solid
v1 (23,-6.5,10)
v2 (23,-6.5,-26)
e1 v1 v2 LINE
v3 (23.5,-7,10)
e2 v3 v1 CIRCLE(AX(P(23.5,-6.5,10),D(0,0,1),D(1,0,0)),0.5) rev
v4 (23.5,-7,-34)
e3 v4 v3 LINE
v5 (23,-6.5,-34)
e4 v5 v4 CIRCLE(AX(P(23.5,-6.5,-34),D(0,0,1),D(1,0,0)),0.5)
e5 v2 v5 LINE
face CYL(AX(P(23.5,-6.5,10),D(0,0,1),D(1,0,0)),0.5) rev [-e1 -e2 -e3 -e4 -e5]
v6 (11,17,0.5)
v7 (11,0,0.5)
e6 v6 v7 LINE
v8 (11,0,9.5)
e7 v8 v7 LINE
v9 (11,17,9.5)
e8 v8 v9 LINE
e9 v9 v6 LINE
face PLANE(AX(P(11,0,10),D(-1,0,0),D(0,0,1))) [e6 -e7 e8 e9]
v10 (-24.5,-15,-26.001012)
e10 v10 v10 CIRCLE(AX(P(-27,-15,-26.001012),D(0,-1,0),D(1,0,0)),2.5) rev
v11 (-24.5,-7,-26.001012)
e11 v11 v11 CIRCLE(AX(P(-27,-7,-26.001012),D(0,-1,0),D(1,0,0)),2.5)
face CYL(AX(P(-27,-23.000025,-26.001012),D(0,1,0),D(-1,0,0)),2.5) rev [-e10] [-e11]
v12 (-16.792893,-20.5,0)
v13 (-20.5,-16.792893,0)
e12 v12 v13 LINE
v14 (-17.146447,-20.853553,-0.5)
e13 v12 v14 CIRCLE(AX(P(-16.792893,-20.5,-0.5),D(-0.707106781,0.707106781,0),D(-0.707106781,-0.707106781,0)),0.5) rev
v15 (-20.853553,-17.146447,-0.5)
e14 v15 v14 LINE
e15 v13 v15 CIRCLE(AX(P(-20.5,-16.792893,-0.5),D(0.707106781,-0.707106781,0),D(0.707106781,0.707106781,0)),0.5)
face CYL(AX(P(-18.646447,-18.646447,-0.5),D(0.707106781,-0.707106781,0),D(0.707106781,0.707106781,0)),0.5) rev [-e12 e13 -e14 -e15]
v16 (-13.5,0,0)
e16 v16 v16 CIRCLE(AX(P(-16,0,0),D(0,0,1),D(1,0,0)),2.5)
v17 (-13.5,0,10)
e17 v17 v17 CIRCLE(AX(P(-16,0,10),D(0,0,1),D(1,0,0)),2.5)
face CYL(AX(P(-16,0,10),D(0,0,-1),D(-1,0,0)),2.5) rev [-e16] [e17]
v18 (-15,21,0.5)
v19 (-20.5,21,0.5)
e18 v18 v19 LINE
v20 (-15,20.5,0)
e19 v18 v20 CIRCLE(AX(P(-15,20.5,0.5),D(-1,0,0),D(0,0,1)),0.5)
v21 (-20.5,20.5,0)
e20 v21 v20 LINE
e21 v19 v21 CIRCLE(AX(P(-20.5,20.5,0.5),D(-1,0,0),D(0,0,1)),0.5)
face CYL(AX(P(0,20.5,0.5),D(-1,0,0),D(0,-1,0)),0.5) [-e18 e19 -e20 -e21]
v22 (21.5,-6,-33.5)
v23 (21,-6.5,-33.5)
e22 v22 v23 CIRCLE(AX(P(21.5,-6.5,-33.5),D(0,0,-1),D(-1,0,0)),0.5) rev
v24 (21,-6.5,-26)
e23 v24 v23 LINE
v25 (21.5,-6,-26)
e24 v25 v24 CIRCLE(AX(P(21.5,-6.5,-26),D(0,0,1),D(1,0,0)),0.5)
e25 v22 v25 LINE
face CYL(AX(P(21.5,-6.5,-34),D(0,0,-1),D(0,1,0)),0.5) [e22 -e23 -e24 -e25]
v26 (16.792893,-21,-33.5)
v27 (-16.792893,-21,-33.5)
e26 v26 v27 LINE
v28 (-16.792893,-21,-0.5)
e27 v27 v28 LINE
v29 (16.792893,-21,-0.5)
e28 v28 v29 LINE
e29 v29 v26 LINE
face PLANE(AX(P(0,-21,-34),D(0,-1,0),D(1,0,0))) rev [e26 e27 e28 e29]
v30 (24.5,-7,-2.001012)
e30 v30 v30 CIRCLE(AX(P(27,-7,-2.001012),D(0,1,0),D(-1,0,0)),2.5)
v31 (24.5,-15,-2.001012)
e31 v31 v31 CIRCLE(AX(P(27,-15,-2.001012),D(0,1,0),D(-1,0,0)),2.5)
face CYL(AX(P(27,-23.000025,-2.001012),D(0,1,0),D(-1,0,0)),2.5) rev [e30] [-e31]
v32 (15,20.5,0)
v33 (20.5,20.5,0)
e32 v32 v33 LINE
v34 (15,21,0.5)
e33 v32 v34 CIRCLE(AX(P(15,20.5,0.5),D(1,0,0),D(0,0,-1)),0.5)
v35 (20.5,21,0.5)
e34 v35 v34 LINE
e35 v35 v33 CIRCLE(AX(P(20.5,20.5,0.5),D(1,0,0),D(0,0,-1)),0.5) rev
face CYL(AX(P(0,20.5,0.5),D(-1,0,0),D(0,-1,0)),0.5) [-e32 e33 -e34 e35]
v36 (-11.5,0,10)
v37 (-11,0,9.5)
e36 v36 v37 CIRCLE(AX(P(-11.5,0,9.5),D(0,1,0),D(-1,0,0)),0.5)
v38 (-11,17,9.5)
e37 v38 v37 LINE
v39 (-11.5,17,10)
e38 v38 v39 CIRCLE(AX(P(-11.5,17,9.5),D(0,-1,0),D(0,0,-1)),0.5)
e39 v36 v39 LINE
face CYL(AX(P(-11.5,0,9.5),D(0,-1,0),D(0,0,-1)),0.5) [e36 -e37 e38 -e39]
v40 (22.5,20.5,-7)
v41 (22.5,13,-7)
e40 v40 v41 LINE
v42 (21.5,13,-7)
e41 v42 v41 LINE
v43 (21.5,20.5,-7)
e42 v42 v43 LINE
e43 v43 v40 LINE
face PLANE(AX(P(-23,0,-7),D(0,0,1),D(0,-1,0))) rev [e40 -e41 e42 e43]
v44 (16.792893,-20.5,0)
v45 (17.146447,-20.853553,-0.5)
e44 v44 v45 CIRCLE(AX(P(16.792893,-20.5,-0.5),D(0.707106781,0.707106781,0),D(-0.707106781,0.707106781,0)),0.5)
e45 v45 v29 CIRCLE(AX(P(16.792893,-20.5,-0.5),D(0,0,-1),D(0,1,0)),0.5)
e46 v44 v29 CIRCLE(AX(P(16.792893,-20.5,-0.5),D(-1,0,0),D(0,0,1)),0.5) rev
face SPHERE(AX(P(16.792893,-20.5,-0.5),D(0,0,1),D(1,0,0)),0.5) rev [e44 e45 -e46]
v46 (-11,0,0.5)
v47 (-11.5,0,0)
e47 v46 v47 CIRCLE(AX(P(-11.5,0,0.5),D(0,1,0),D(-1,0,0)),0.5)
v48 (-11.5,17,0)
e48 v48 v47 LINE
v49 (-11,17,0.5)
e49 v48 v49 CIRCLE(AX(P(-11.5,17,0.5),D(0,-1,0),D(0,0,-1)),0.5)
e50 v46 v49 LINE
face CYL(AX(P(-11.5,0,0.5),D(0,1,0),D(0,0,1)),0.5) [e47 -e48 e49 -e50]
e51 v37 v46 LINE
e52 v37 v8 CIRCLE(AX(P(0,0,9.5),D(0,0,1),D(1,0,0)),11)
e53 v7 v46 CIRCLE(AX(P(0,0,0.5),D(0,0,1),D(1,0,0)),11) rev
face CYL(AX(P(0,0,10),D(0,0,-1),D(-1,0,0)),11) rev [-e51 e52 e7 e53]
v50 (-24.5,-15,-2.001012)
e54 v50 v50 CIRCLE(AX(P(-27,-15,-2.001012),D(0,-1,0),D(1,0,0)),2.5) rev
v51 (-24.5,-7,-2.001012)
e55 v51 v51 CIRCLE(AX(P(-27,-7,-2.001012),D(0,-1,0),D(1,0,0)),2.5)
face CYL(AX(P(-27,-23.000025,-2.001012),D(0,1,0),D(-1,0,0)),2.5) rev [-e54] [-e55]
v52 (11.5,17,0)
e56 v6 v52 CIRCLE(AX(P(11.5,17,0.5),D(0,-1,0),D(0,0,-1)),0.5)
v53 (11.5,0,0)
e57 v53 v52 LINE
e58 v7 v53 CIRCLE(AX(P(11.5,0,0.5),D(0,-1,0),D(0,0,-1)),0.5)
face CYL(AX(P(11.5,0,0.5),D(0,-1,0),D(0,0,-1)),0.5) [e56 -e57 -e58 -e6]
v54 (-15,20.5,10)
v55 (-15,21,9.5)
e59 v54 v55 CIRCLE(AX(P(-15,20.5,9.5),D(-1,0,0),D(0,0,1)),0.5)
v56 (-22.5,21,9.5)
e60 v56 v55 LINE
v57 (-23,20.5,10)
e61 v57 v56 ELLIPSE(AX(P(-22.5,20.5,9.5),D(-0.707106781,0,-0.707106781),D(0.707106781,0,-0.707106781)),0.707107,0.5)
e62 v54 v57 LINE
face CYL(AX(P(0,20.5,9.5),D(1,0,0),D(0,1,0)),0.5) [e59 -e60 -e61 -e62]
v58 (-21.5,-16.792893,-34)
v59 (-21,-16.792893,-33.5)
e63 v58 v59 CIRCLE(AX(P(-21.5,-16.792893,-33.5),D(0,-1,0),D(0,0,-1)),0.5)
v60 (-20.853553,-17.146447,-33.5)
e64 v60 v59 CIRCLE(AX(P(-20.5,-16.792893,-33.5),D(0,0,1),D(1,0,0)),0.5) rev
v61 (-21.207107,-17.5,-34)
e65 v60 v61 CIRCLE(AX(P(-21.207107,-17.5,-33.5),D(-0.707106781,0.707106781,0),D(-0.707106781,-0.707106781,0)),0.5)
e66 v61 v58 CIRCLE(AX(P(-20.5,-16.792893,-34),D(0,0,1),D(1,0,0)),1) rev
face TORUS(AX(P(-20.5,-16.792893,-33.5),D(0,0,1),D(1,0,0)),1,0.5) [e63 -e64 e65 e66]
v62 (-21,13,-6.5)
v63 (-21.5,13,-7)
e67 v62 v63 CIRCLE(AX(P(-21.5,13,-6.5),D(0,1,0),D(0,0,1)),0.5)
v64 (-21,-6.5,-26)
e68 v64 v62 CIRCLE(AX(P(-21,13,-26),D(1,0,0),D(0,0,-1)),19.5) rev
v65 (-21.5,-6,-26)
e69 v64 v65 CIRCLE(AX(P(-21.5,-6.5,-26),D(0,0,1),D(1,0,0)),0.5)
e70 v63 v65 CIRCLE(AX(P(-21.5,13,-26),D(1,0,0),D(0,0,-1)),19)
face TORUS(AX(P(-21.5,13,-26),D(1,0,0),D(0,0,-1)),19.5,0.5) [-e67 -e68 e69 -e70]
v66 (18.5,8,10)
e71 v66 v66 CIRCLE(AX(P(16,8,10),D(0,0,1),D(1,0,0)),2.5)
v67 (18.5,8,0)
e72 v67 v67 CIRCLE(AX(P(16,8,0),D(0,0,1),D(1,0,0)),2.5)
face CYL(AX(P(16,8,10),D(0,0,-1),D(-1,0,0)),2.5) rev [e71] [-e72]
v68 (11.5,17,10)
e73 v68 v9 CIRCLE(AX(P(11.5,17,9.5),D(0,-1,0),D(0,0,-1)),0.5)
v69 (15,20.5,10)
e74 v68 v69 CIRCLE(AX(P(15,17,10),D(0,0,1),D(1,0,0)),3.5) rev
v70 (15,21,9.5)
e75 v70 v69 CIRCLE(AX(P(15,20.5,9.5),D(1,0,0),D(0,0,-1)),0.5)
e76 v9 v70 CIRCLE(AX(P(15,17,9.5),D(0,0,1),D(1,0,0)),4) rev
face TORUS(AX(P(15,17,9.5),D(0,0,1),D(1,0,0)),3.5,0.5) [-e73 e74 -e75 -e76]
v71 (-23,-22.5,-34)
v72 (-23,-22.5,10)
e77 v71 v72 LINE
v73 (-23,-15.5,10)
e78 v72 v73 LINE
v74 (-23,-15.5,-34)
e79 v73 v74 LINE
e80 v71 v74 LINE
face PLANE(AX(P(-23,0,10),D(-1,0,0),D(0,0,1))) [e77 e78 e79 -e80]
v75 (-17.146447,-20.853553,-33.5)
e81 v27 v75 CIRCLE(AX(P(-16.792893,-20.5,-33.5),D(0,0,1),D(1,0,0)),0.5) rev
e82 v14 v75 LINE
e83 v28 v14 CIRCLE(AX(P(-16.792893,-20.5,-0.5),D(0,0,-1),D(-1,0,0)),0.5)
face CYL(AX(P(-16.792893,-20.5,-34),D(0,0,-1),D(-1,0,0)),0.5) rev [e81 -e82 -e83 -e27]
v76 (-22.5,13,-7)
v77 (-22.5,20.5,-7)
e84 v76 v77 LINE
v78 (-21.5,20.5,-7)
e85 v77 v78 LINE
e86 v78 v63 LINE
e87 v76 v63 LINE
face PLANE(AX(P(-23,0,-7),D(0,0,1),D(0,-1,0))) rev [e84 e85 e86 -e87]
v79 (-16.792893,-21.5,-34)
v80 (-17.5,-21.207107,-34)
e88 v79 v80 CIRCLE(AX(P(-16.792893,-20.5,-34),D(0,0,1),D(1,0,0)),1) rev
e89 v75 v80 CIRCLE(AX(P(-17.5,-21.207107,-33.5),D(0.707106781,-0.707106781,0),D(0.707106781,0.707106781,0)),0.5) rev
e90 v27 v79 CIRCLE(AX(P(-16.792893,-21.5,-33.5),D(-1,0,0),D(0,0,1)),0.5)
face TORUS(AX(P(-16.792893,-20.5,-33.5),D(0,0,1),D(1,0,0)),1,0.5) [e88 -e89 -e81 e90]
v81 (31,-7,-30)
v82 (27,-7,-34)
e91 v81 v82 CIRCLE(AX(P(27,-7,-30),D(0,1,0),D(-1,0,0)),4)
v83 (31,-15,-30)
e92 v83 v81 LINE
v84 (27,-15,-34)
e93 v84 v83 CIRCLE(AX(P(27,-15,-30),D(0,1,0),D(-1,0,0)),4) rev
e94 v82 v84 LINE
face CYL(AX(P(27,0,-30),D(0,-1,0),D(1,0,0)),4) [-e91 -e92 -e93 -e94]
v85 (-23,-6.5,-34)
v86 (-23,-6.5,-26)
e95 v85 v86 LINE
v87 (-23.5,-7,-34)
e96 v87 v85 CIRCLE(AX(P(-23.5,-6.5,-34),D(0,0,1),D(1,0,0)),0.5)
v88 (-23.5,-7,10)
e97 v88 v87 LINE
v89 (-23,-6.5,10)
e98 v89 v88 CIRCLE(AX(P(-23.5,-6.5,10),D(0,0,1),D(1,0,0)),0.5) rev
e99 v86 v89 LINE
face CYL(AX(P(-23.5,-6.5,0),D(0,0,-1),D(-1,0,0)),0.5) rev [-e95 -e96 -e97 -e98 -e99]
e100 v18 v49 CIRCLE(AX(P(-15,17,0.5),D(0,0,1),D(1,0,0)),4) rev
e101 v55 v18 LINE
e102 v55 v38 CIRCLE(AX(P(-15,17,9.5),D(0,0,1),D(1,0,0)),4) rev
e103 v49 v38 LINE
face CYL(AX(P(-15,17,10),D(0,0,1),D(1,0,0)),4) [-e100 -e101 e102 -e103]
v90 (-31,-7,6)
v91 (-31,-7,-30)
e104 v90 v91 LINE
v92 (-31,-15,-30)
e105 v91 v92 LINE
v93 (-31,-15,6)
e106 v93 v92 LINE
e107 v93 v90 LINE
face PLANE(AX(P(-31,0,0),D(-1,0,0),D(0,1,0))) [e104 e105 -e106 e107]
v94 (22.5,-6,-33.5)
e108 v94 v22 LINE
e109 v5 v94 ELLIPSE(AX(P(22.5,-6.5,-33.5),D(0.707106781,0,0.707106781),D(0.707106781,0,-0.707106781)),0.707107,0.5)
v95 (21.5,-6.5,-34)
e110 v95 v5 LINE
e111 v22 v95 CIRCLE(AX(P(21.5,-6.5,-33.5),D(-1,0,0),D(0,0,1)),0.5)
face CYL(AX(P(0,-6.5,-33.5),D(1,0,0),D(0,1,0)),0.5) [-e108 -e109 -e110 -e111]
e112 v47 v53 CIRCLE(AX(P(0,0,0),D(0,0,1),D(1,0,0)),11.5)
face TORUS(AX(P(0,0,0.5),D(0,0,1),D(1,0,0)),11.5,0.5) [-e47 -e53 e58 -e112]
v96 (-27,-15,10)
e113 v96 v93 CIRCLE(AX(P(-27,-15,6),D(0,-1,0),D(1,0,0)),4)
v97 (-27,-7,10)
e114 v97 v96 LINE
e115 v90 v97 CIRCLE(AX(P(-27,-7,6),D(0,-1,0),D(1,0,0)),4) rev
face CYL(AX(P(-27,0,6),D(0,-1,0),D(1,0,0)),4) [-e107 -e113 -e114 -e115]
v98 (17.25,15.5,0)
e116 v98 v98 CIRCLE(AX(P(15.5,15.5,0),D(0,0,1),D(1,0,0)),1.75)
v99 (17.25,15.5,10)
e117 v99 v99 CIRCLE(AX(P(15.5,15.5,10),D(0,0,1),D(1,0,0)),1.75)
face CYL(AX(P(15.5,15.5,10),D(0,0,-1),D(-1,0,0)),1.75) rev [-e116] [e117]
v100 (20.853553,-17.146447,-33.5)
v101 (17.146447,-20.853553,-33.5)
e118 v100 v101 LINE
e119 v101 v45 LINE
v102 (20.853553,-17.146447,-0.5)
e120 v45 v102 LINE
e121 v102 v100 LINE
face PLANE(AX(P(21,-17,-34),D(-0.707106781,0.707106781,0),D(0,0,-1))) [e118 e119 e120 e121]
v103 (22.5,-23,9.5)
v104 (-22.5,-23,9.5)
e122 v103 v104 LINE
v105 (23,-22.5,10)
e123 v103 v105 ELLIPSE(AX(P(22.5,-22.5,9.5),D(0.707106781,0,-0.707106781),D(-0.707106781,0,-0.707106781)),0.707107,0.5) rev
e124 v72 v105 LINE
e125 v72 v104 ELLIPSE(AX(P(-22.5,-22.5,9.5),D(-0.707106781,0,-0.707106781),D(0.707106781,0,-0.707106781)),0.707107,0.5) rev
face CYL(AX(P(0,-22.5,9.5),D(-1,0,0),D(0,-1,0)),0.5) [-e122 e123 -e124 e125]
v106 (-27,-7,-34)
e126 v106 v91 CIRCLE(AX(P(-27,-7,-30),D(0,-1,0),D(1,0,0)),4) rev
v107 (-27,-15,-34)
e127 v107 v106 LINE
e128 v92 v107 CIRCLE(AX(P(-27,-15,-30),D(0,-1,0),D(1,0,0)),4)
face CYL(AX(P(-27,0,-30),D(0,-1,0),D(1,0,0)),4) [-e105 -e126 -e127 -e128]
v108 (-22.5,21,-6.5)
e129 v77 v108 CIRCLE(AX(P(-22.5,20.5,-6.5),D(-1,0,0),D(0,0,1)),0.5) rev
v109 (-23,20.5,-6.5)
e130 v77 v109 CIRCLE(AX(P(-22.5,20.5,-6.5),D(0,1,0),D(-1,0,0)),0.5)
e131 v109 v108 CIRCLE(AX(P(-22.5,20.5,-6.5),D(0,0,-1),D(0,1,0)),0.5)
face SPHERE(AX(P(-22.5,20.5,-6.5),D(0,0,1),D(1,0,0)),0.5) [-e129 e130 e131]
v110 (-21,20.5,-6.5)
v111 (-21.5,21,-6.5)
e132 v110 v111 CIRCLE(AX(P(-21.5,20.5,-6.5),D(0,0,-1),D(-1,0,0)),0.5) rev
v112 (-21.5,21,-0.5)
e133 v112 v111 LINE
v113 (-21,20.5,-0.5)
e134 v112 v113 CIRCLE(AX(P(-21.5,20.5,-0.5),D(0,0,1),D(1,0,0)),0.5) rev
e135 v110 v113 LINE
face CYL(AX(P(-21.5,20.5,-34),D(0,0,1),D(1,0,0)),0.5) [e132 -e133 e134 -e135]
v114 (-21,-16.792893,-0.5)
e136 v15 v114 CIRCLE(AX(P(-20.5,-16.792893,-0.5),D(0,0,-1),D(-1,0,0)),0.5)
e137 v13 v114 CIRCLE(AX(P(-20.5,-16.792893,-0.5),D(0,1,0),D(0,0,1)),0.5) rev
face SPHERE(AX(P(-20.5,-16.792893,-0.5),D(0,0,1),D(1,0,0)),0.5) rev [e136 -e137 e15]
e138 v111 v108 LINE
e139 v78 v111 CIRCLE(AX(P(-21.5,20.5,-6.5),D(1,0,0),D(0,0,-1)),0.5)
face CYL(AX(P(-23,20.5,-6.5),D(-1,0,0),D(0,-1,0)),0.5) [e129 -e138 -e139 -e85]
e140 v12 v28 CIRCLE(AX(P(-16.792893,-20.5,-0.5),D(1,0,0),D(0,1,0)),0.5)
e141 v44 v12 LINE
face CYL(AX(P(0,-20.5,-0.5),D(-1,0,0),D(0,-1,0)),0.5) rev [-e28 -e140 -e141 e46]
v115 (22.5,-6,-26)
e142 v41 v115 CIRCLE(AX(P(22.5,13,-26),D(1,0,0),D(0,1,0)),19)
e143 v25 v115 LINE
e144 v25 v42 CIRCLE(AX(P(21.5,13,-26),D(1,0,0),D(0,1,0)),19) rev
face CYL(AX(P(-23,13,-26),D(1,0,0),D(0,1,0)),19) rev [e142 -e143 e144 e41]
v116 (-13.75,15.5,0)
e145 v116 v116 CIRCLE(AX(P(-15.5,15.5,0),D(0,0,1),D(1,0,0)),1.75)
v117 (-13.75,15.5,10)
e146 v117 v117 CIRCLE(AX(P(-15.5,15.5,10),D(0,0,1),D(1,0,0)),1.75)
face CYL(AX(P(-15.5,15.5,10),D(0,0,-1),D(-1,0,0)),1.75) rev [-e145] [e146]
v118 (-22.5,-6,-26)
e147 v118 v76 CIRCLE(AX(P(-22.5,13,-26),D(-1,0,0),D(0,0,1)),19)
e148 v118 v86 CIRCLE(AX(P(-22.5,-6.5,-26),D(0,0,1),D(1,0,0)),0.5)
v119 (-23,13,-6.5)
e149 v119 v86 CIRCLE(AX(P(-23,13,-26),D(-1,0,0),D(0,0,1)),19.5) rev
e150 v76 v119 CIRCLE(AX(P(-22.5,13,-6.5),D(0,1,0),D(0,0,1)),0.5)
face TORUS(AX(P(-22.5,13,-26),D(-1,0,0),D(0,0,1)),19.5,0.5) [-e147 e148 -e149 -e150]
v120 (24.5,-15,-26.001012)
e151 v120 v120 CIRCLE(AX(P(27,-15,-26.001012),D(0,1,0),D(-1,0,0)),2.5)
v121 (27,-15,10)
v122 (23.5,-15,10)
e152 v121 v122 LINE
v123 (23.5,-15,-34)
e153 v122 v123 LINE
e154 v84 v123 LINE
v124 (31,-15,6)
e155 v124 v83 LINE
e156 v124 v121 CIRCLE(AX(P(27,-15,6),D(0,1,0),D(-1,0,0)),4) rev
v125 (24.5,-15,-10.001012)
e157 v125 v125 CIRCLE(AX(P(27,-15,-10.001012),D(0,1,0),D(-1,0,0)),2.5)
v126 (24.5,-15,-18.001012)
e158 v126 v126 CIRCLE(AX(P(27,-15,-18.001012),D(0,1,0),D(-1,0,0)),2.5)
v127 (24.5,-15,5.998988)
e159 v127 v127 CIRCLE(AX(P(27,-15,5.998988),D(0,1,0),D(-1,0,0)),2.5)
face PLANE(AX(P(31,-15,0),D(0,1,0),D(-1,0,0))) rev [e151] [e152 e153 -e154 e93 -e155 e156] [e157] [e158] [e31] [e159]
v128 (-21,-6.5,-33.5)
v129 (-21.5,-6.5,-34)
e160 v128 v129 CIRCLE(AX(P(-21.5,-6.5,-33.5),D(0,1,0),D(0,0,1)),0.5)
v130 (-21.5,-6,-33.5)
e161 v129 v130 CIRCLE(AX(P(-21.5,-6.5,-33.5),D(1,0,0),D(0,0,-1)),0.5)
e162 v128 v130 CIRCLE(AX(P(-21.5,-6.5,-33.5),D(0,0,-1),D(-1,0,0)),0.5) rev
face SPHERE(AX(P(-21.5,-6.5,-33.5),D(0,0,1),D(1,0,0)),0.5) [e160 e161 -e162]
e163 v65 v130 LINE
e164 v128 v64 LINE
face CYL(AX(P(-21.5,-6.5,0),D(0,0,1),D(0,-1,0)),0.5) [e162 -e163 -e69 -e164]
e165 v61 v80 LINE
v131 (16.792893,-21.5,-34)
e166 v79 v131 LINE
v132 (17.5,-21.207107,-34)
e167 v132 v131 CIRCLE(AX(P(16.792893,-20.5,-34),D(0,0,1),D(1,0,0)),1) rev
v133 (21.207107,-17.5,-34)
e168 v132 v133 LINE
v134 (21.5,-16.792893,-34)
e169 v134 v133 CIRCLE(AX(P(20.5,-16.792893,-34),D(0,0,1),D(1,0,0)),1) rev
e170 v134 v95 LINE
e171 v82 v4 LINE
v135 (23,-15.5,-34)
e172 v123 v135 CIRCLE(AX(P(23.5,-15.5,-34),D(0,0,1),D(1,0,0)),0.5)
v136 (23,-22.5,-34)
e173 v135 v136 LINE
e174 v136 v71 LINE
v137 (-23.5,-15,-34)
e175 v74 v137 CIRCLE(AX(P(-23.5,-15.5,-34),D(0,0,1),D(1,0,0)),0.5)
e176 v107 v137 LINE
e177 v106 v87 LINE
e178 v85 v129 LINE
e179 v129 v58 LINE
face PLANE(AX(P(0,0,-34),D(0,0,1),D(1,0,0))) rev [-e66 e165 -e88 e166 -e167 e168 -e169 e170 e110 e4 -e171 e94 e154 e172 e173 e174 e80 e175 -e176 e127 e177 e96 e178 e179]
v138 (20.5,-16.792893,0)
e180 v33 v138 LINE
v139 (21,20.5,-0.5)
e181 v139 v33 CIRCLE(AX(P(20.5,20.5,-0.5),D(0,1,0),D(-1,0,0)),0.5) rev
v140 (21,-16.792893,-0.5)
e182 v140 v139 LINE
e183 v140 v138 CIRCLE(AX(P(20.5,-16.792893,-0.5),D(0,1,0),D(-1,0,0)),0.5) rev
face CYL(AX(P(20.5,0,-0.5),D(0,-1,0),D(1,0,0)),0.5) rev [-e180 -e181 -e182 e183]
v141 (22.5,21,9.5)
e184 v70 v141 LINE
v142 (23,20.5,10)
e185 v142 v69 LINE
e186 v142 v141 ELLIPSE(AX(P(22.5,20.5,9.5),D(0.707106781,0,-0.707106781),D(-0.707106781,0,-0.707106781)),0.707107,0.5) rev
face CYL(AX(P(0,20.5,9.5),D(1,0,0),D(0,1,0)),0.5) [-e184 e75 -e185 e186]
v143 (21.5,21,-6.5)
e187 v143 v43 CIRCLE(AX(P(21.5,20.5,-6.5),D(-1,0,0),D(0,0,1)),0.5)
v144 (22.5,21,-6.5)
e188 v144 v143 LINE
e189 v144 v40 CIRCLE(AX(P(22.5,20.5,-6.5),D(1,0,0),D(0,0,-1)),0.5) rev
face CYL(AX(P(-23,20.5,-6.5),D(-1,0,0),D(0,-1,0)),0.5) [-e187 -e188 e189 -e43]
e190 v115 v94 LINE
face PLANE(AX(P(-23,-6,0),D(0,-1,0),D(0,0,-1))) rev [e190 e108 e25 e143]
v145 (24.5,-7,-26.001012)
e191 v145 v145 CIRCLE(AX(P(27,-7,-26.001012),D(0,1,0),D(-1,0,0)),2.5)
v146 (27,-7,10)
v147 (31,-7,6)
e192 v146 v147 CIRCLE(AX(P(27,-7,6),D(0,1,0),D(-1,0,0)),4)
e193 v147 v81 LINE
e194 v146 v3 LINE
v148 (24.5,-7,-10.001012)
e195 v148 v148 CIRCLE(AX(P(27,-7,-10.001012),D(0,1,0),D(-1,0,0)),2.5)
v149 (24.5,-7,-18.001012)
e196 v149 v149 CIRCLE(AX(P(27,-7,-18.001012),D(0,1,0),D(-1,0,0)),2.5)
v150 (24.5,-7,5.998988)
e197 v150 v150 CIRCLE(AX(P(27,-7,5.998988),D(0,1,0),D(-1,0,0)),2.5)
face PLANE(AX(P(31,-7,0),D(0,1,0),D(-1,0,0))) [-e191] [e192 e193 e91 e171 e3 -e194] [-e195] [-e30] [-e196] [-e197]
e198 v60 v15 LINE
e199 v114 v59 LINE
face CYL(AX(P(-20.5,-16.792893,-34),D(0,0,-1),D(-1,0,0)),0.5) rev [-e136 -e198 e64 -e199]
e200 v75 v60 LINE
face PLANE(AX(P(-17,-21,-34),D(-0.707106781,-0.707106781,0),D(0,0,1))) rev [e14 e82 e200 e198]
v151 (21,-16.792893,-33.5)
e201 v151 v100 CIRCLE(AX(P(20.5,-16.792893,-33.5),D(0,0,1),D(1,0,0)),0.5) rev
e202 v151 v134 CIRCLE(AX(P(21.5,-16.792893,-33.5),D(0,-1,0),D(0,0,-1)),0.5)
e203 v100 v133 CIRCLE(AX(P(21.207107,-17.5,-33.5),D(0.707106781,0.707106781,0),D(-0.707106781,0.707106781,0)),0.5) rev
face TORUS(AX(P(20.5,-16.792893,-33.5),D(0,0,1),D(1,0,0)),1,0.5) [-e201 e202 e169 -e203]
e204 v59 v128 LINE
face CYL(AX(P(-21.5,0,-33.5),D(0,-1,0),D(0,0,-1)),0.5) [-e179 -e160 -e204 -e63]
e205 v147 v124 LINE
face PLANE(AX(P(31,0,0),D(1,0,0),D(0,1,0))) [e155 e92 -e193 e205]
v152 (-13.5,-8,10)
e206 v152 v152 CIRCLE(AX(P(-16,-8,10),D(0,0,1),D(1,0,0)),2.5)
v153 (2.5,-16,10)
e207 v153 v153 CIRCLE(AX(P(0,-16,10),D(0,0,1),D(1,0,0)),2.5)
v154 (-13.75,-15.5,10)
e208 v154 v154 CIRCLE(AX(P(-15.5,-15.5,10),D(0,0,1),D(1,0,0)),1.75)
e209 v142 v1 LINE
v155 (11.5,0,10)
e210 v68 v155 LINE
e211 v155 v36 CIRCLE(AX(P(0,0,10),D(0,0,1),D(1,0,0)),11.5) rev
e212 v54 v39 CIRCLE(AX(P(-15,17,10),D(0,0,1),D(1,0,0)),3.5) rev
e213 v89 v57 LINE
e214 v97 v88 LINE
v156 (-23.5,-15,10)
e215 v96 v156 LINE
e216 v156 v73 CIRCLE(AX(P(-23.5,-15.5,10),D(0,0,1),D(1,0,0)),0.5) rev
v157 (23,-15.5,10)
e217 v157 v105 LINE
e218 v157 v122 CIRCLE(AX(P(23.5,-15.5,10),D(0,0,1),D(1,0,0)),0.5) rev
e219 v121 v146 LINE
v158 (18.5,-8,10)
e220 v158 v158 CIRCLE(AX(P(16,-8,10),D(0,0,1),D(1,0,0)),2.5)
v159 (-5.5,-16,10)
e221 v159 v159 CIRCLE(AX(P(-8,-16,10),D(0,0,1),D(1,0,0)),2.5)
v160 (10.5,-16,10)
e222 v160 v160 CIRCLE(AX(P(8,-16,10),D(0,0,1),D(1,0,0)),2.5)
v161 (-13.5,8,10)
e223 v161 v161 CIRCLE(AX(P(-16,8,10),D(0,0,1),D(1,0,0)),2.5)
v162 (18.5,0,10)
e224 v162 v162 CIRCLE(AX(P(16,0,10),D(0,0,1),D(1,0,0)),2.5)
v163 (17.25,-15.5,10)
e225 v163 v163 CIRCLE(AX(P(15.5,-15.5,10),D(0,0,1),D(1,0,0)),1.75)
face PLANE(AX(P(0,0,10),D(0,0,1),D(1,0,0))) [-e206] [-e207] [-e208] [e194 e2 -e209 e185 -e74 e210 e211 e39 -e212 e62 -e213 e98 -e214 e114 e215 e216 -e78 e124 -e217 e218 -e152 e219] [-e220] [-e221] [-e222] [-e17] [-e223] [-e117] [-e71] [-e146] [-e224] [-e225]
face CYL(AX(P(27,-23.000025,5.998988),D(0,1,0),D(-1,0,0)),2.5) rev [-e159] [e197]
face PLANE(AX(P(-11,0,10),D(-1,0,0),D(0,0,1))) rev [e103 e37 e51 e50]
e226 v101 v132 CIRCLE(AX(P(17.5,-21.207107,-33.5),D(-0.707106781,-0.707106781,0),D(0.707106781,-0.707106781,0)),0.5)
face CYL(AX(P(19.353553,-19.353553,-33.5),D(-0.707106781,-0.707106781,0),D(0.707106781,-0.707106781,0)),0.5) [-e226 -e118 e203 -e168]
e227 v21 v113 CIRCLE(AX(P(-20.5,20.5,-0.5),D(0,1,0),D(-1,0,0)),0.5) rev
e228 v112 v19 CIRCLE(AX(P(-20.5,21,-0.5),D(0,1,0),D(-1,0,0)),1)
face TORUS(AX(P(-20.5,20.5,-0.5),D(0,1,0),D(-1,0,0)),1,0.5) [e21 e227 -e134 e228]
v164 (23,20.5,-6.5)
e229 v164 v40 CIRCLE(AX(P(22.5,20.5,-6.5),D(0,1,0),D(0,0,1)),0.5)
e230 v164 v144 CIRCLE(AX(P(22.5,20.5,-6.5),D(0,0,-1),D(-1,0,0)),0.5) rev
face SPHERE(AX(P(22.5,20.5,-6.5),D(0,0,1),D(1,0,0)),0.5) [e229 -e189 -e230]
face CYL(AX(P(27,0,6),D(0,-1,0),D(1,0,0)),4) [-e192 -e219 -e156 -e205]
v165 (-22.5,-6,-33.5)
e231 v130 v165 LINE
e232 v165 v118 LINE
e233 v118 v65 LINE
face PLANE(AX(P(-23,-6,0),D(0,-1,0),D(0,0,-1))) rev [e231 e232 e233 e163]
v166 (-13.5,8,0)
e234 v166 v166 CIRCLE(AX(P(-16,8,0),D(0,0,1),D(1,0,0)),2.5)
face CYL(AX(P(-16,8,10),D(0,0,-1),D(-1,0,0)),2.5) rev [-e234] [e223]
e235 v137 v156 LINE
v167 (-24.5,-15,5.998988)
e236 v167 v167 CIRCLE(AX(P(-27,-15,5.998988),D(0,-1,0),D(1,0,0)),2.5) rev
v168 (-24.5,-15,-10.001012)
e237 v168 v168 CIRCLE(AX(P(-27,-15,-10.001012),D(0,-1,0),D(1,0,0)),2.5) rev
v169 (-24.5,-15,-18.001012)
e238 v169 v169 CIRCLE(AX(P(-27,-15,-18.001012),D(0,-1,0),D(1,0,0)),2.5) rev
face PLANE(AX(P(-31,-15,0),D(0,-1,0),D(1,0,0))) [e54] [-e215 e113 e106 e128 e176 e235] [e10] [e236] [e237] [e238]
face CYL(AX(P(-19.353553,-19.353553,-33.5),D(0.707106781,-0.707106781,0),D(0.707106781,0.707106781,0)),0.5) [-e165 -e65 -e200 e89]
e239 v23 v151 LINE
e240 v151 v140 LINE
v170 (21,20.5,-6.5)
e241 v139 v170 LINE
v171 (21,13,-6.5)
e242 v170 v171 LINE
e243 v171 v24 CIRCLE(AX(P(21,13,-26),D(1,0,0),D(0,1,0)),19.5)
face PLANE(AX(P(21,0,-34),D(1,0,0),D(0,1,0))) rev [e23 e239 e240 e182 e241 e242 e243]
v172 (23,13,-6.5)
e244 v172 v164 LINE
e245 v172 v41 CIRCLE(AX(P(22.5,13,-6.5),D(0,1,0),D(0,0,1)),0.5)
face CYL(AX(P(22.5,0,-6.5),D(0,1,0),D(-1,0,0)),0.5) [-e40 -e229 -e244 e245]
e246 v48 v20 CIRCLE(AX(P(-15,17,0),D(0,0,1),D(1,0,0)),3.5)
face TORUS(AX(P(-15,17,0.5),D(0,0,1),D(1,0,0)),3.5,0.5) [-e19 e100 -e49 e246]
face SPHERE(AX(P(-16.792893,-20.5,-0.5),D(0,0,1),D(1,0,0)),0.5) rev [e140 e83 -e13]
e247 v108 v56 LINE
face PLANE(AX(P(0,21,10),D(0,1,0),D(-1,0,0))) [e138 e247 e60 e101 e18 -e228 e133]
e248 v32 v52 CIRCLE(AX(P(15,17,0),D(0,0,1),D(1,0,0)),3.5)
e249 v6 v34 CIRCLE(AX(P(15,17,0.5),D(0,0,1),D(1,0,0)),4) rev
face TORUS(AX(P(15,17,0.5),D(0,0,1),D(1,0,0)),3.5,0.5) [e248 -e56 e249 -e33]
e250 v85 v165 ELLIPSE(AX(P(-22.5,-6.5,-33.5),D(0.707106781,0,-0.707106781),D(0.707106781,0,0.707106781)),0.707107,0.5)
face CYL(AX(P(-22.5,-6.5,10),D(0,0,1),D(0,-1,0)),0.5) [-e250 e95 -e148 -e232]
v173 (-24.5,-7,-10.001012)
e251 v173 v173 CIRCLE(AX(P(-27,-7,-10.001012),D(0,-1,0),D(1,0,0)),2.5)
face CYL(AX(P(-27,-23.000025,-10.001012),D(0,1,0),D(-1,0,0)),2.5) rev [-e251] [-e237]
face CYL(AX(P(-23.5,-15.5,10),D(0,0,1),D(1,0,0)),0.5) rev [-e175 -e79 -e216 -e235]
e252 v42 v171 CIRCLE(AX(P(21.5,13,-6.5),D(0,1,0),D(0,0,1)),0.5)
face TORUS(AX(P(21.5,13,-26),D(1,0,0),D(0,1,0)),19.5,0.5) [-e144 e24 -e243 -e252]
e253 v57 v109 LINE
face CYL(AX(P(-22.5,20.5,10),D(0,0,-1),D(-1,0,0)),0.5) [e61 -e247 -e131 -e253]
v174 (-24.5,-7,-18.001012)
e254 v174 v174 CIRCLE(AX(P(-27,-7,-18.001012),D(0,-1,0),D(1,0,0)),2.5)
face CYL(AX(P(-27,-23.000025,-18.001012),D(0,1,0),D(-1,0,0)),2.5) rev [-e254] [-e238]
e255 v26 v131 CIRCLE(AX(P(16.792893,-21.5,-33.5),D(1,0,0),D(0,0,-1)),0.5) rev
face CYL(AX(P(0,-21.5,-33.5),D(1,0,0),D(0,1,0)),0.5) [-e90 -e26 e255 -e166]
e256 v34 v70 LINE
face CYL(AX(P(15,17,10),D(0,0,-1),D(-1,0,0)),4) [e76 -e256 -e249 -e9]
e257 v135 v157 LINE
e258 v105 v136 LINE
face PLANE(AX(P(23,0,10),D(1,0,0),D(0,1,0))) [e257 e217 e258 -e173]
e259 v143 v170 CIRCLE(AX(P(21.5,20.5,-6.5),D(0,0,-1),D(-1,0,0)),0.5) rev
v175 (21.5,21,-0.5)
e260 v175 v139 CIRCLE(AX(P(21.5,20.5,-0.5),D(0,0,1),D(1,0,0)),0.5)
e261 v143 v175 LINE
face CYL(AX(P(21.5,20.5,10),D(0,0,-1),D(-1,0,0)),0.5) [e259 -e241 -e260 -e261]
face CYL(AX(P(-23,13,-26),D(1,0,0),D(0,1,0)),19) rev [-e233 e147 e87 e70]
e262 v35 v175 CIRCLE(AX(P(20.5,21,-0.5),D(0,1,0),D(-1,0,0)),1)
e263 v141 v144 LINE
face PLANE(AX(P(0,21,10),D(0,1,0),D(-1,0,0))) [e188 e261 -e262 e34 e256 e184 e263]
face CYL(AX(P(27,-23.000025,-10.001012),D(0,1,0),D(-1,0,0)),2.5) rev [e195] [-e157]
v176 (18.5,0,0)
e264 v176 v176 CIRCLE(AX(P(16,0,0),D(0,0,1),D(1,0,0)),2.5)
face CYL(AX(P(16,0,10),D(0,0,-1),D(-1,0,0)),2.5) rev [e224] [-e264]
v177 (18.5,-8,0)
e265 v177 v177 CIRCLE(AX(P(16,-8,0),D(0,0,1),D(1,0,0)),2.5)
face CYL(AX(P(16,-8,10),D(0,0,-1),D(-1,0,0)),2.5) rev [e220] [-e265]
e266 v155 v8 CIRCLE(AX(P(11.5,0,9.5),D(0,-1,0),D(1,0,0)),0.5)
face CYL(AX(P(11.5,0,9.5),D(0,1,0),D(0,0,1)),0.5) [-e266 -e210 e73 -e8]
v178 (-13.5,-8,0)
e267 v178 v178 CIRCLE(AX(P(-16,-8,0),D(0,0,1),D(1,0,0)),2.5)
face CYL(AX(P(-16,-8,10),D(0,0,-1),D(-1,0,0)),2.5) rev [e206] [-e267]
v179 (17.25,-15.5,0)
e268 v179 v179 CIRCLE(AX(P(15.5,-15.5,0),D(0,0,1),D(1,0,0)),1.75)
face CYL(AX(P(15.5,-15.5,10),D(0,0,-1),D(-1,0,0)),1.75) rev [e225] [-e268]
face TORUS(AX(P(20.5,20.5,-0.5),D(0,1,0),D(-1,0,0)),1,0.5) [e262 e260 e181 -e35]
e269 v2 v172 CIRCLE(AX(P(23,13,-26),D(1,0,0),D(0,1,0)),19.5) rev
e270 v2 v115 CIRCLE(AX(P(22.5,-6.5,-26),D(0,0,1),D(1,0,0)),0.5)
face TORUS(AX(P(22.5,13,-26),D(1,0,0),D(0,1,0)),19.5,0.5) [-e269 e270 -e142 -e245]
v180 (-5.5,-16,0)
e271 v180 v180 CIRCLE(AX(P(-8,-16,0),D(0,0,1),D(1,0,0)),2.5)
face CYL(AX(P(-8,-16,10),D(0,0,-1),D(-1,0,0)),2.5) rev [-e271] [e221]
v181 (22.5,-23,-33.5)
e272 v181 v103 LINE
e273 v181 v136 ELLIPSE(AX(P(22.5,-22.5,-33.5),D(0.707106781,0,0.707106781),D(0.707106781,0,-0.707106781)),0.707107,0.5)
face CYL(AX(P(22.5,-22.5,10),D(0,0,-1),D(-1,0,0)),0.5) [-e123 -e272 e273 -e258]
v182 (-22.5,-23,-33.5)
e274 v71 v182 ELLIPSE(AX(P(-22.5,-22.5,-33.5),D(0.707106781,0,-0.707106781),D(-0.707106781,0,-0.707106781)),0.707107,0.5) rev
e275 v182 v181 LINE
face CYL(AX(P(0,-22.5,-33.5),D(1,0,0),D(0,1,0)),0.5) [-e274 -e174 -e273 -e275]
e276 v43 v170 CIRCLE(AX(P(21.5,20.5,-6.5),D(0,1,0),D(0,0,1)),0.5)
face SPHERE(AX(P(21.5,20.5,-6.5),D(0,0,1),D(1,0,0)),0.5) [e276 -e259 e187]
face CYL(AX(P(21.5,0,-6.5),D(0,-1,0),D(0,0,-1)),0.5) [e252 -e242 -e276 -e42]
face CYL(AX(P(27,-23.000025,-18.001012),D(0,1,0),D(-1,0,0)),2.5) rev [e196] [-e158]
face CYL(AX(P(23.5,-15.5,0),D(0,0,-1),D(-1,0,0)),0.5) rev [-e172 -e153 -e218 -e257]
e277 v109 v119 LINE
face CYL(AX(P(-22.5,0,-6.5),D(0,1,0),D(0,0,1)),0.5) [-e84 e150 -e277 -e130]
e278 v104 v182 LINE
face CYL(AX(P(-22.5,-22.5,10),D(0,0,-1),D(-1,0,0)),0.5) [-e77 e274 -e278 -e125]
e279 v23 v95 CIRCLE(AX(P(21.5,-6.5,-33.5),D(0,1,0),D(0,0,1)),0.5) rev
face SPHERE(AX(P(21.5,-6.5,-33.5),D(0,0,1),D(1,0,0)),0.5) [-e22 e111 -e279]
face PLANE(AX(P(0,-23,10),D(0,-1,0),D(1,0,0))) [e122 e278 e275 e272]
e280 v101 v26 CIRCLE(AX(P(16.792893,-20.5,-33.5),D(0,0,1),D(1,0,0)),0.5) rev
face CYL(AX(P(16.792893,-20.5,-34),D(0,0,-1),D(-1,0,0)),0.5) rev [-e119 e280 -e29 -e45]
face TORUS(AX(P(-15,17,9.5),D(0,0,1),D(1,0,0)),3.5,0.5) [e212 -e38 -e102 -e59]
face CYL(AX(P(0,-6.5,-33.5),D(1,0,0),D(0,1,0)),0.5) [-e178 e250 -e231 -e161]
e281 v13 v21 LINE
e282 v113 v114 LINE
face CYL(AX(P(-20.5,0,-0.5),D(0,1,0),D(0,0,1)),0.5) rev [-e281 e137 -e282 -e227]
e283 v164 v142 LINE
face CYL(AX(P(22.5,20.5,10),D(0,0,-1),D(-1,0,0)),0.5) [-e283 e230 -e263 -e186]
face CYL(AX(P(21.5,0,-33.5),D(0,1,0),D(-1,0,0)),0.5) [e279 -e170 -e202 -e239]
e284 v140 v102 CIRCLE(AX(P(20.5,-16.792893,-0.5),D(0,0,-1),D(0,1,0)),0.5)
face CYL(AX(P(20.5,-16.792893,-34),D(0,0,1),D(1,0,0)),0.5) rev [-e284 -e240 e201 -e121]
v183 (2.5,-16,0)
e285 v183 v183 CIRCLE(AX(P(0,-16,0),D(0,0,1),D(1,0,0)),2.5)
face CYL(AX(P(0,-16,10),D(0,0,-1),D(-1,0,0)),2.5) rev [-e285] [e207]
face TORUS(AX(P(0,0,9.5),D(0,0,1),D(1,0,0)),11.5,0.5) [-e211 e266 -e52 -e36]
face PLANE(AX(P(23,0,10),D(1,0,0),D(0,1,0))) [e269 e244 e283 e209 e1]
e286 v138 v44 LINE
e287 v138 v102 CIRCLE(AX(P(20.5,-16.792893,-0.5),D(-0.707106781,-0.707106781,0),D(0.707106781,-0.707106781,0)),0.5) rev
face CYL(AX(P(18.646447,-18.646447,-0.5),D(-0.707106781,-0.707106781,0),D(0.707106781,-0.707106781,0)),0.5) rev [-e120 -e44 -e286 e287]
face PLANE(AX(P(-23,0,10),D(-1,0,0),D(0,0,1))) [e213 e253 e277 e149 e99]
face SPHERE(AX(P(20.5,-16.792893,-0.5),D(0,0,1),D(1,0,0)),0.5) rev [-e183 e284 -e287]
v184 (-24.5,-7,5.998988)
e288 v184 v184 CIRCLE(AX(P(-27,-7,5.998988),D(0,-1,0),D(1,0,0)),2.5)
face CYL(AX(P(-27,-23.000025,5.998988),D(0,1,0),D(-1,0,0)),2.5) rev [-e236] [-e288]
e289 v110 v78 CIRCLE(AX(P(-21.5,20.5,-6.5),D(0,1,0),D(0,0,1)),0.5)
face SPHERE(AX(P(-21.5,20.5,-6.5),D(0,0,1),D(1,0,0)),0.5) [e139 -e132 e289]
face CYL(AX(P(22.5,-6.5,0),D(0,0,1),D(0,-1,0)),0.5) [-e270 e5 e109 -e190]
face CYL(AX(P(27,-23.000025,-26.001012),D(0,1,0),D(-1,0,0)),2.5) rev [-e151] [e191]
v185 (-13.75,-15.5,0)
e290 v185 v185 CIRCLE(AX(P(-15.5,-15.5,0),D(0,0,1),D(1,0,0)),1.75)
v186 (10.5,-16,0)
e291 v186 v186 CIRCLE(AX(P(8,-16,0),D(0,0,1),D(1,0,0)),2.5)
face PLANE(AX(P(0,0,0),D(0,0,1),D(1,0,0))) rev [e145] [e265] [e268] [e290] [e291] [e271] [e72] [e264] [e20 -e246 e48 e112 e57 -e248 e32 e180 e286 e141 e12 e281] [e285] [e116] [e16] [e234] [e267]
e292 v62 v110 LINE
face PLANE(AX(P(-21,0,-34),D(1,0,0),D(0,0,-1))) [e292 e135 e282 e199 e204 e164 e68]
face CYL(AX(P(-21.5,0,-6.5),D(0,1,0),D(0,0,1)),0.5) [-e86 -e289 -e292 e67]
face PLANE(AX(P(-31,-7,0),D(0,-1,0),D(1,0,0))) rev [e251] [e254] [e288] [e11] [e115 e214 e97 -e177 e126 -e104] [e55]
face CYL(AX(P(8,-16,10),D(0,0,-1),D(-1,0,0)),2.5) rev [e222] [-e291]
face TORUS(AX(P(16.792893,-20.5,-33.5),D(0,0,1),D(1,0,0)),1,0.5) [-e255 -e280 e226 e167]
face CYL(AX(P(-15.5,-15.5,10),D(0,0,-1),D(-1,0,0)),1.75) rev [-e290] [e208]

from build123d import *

# Parameters (mm, degrees)
SKETCH1_R           = 2.5
SKETCH1_R_2         = 1.75
BOSS_EXTRUDE1_DEPTH = 10
BOSS_EXTRUDE2_DEPTH = 34
CUT_EXTRUDE1_DEPTH  = 62.652250567
SKETCH3_3_W         = 44
SKETCH3_3_H         = 8
BOSS_EXTRUDE3_DEPTH = 8
SKETCH4_R           = 2.5
CUT_EXTRUDE2_DEPTH  = 54.860932038
CHAMFER1_SIZE       = 4
FILLET1_R           = 0.5
FILLET2_R           = 4


# Some blends are built 0.0001 mm under size
with BuildPart() as part:
    # Sketch1 → Boss-Extrude1 (new body)
    # profile 1 of 2: a face of its own
    with BuildSketch(Plane.XY):
        with BuildLine():
            ThreePointArc((-11, 0), (0, -11), (11, 0))
            Line((11, 0), (11, 21))
            Line((11, 21), (21, 21))
            Line((21, 21), (21, -21))
            Line((21, -21), (-21, -21))
            Line((-21, -21), (-21, 21))
            Line((-21, 21), (-11, 21))
            Line((-11, 21), (-11, 0))
        make_face()
        with Locations((-16, 8)):
            Circle(SKETCH1_R, mode=Mode.SUBTRACT)
        with Locations((-16, -8)):
            Circle(SKETCH1_R, mode=Mode.SUBTRACT)
        with Locations((-8, -16)):
            Circle(SKETCH1_R, mode=Mode.SUBTRACT)
        with Locations((8, -16)):
            Circle(SKETCH1_R, mode=Mode.SUBTRACT)
        with Locations((16, -8)):
            Circle(SKETCH1_R, mode=Mode.SUBTRACT)
        with Locations((16, 8)):
            Circle(SKETCH1_R, mode=Mode.SUBTRACT)
        with Locations((0, -16)):
            Circle(SKETCH1_R, mode=Mode.SUBTRACT)
        with Locations((-16, 0)):
            Circle(SKETCH1_R, mode=Mode.SUBTRACT)
        with Locations((16, 0)):
            Circle(SKETCH1_R, mode=Mode.SUBTRACT)
        with Locations((15.5, -15.5)):
            Circle(SKETCH1_R_2, mode=Mode.SUBTRACT)
        with Locations((15.5, 15.5)):
            Circle(SKETCH1_R_2, mode=Mode.SUBTRACT)
        with Locations((-15.5, 15.5)):
            Circle(SKETCH1_R_2, mode=Mode.SUBTRACT)
        with Locations((-15.5, -15.5)):
            Circle(SKETCH1_R_2, mode=Mode.SUBTRACT)
    # profile 2 of 2: a face of its own
    with BuildSketch(Plane.XY):
        Polygon((-23, 21), (-21, 21), (-21, -21), (21, -21), (21, 21), (23, 21), (23, -23), (-23, -23), align=None)
    extrude(amount=BOSS_EXTRUDE1_DEPTH)

    # Sketch1<3> → Boss-Extrude2 (add)
    with BuildSketch(Plane.XY):
        Polygon((-23, 21), (-21, 21), (-21, -21), (21, -21), (21, 21), (23, 21), (23, -23), (-23, -23), align=None)
    extrude(amount=-BOSS_EXTRUDE2_DEPTH)

    # Sketch3 → Cut-Extrude1 (cut, through all)
    with BuildSketch(Plane(origin=(23, 0, 0), x_dir=(0, 0, -1), z_dir=(1, 0, 0))):
        with BuildLine():
            Line((34, 21), (7, 21))
            Line((7, 21), (7, 13))
            ThreePointArc((7, 13), (12.564971157, -0.435028843), (26, -6))
            Line((26, -6), (34, -6))
            Line((34, -6), (34, 21))
        make_face()
    extrude(amount=-CUT_EXTRUDE1_DEPTH, mode=Mode.SUBTRACT)

    # Sketch3<3> → Boss-Extrude3 (add)
    with BuildSketch(Plane(origin=(23, 0, 0), x_dir=(0, 0, -1), z_dir=(1, 0, 0))):
        with Locations((12, -11)):
            Rectangle(SKETCH3_3_W, SKETCH3_3_H)
    boss_extrude3 = extrude(amount=BOSS_EXTRUDE3_DEPTH)

    # Sketch4 → Cut-Extrude2 (cut, through all)
    with BuildSketch(Plane(origin=(0, -7, 0), x_dir=(1, 0, 0), z_dir=(0, 1, 0))):
        with Locations(Location((27, -5.998987859, 0), (0, 0, 180))):
            Circle(SKETCH4_R)
        with Locations(Location((27, 2.001012141, 0), (0, 0, 180))):
            Circle(SKETCH4_R)
        with Locations(Location((27, 10.001012141, 0), (0, 0, 180))):
            Circle(SKETCH4_R)
        with Locations(Location((27, 18.001012141, 0), (0, 0, 180))):
            Circle(SKETCH4_R)
        with Locations(Location((27, 26.001012141, 0), (0, 0, 180))):
            Circle(SKETCH4_R)
    cut_extrude2 = extrude(amount=-CUT_EXTRUDE2_DEPTH, mode=Mode.SUBTRACT)

    # Mirror1: Boss-Extrude3, Cut-Extrude2 across plane
    add(boss_extrude3.mirror(Plane(origin=(0, 0, 0), x_dir=(0, 0, 1), z_dir=(1, 0, 0))))
    add(cut_extrude2.mirror(Plane(origin=(0, 0, 0), x_dir=(0, 0, 1), z_dir=(1, 0, 0))), mode=Mode.SUBTRACT)

    # Chamfer1
    chamfer1_edges = [part.edges().sort_by_distance(p)[0] for p in [
        (-21, -21, -17),
        (21, -21, -17),
    ]]
    chamfer(chamfer1_edges, length=CHAMFER1_SIZE)

    # Fillet1
    fillet1_edges = [part.edges().sort_by_distance(p)[0] for p in [
        (-21, 21, -3.5),
        (21, 21, -3.5),
        (-11, 10.5, 10),
        (0, -11, 10),
        (-11, 10.5, 0),
        (0, -11, 0),
        (-23, 17, -7),
        (-23, -6, -30),
        (-21, -6, -30),
        (-21, -0.435028843, -12.564971157),
        (23, 17, -7),
        (23, -6, -30),
        (21, 17, -7),
        (21, -6, -30),
        (0, -23, 10),
        (23, -23, -12),
        (0, -23, -34),
        (-23, -23, -12),
        (0, -21, -34),
        (0, -21, 0),
        (-21, -11.5, -34),
        (21, -11.5, -34),
        (-23, -15, -12),
        (23, -15, -12),
        (11, 10.5, 10),
        (-17, 21, 10),
        (17, 21, 10),
        (23, 21, 1.5),
        (-23, 21, 1.5),
        (-16, 21, 0),
        (16, 21, 0),
        (11, 10.5, 0),
        (-23, -7, -12),
        (23, -7, -12),
        (22, -6, -34),
        (-22, -6, -34),
        (-23, -0.435028843, -12.564971157),
        (-21, 17, -7),
        (-22, 21, -7),
        (22, 21, -7),
        (23, -0.435028843, -12.564971157),
        (21, -0.435028843, -12.564971157),
        (21, 2, 0),
        (-21, 2, 0),
        (17, -21, -17),
        (-17, -21, -17),
        (19, -19, 0),
        (21, -17, -17),
        (-19, -19, 0),
        (-21, -17, -17),
        (19, -19, -34),
        (-19, -19, -34),
    ]]
    fillet(fillet1_edges, radius=FILLET1_R - 0.0001)  # a hair under: the kernel refuses the full size

    # Fillet2
    # the kernel refuses this fillet: 4 mm, written as the material it takes off along each edge
    with BuildSketch(Plane(origin=(-15, 17, 0), x_dir=(0, 1, 0), z_dir=(-1, 0, 0))) as fillet2_piece_1:
        with BuildLine():
            CenterArc((3.5001, -0.4999), 0.4999, 0, 90)
            Line((4, -0.4999), (4, 0))
            Line((4, 0), (3.5001, 0))
        make_face()
    revolve(axis=Axis((-15, 17, 0), (0, 0, -1)), revolution_arc=90, mode=Mode.SUBTRACT)
    with BuildSketch(Plane(origin=(-15, 17, 10), x_dir=(1, 0, 0), z_dir=(0, -1, 0))) as fillet2_piece_2:
        with BuildLine():
            CenterArc((3.5001, -0.4999), 0.4999, 0, 90)
            Line((4, -0.4999), (4, 0))
            Line((4, 0), (3.5001, 0))
        make_face()
    revolve(axis=Axis((-15, 17, 10), (0, 0, 1)), revolution_arc=90, mode=Mode.SUBTRACT)
    with BuildSketch(Plane(origin=(15, 17, 0), x_dir=(-1, 0, 0), z_dir=(0, -1, 0))) as fillet2_piece_3:
        with BuildLine():
            CenterArc((3.5001, -0.4999), 0.4999, 0, 90)
            Line((4, -0.4999), (4, 0))
            Line((4, 0), (3.5001, 0))
        make_face()
    revolve(axis=Axis((15, 17, 0), (0, 0, -1)), revolution_arc=90, mode=Mode.SUBTRACT)
    with BuildSketch(Plane(origin=(15, 17, 10), x_dir=(0, 1, 0), z_dir=(1, 0, 0))) as fillet2_piece_4:
        with BuildLine():
            CenterArc((3.5001, -0.4999), 0.4999, 0, 90)
            Line((4, -0.4999), (4, 0))
            Line((4, 0), (3.5001, 0))
        make_face()
    revolve(axis=Axis((15, 17, 10), (0, 0, 1)), revolution_arc=90, mode=Mode.SUBTRACT)
    with BuildSketch(Plane(origin=(-31, -25, -34), x_dir=(0, 0, 1), z_dir=(0, 1, 0)), Plane(origin=(31, 3, 10), x_dir=(-1, 0, 0), z_dir=(0, -1, 0))) as fillet2_piece_5:
        with BuildLine():
            CenterArc((FILLET2_R, FILLET2_R), FILLET2_R, 180, 90)
            Line((0, FILLET2_R), (0, 0))
            Line((0, 0), (FILLET2_R, 0))
        make_face()
    extrude(amount=28, mode=Mode.SUBTRACT)
    with BuildSketch(Plane(origin=(-31, 3, 10), x_dir=(1, 0, 0), z_dir=(0, -1, 0)), Plane(origin=(31, -25, -34), x_dir=(0, 0, 1), z_dir=(0, 1, 0))) as fillet2_piece_6:
        with BuildLine():
            CenterArc((FILLET2_R, -FILLET2_R), FILLET2_R, 90, 90)
            Line((0, -FILLET2_R), (0, 0))
            Line((0, 0), (FILLET2_R, 0))
        make_face()
    extrude(amount=28, mode=Mode.SUBTRACT)
    with BuildSketch(Plane(origin=(11, 21, 0), x_dir=(0, -1, 0), z_dir=(0, 0, 1))) as fillet2_piece_7:
        with BuildLine():
            CenterArc((FILLET2_R, FILLET2_R), FILLET2_R, 180, 90)
            Line((0, FILLET2_R), (0, 0))
            Line((0, 0), (FILLET2_R, 0))
        make_face()
    extrude(amount=10, mode=Mode.SUBTRACT)
    with BuildSketch(Plane(origin=(-11, 21, 0), x_dir=(0, -1, 0), z_dir=(0, 0, 1))) as fillet2_piece_8:
        with BuildLine():
            CenterArc((FILLET2_R, -FILLET2_R), FILLET2_R, 90, 90)
            Line((0, -FILLET2_R), (0, 0))
            Line((0, 0), (FILLET2_R, 0))
        make_face()
    extrude(amount=10, mode=Mode.SUBTRACT)


solid = part.part
